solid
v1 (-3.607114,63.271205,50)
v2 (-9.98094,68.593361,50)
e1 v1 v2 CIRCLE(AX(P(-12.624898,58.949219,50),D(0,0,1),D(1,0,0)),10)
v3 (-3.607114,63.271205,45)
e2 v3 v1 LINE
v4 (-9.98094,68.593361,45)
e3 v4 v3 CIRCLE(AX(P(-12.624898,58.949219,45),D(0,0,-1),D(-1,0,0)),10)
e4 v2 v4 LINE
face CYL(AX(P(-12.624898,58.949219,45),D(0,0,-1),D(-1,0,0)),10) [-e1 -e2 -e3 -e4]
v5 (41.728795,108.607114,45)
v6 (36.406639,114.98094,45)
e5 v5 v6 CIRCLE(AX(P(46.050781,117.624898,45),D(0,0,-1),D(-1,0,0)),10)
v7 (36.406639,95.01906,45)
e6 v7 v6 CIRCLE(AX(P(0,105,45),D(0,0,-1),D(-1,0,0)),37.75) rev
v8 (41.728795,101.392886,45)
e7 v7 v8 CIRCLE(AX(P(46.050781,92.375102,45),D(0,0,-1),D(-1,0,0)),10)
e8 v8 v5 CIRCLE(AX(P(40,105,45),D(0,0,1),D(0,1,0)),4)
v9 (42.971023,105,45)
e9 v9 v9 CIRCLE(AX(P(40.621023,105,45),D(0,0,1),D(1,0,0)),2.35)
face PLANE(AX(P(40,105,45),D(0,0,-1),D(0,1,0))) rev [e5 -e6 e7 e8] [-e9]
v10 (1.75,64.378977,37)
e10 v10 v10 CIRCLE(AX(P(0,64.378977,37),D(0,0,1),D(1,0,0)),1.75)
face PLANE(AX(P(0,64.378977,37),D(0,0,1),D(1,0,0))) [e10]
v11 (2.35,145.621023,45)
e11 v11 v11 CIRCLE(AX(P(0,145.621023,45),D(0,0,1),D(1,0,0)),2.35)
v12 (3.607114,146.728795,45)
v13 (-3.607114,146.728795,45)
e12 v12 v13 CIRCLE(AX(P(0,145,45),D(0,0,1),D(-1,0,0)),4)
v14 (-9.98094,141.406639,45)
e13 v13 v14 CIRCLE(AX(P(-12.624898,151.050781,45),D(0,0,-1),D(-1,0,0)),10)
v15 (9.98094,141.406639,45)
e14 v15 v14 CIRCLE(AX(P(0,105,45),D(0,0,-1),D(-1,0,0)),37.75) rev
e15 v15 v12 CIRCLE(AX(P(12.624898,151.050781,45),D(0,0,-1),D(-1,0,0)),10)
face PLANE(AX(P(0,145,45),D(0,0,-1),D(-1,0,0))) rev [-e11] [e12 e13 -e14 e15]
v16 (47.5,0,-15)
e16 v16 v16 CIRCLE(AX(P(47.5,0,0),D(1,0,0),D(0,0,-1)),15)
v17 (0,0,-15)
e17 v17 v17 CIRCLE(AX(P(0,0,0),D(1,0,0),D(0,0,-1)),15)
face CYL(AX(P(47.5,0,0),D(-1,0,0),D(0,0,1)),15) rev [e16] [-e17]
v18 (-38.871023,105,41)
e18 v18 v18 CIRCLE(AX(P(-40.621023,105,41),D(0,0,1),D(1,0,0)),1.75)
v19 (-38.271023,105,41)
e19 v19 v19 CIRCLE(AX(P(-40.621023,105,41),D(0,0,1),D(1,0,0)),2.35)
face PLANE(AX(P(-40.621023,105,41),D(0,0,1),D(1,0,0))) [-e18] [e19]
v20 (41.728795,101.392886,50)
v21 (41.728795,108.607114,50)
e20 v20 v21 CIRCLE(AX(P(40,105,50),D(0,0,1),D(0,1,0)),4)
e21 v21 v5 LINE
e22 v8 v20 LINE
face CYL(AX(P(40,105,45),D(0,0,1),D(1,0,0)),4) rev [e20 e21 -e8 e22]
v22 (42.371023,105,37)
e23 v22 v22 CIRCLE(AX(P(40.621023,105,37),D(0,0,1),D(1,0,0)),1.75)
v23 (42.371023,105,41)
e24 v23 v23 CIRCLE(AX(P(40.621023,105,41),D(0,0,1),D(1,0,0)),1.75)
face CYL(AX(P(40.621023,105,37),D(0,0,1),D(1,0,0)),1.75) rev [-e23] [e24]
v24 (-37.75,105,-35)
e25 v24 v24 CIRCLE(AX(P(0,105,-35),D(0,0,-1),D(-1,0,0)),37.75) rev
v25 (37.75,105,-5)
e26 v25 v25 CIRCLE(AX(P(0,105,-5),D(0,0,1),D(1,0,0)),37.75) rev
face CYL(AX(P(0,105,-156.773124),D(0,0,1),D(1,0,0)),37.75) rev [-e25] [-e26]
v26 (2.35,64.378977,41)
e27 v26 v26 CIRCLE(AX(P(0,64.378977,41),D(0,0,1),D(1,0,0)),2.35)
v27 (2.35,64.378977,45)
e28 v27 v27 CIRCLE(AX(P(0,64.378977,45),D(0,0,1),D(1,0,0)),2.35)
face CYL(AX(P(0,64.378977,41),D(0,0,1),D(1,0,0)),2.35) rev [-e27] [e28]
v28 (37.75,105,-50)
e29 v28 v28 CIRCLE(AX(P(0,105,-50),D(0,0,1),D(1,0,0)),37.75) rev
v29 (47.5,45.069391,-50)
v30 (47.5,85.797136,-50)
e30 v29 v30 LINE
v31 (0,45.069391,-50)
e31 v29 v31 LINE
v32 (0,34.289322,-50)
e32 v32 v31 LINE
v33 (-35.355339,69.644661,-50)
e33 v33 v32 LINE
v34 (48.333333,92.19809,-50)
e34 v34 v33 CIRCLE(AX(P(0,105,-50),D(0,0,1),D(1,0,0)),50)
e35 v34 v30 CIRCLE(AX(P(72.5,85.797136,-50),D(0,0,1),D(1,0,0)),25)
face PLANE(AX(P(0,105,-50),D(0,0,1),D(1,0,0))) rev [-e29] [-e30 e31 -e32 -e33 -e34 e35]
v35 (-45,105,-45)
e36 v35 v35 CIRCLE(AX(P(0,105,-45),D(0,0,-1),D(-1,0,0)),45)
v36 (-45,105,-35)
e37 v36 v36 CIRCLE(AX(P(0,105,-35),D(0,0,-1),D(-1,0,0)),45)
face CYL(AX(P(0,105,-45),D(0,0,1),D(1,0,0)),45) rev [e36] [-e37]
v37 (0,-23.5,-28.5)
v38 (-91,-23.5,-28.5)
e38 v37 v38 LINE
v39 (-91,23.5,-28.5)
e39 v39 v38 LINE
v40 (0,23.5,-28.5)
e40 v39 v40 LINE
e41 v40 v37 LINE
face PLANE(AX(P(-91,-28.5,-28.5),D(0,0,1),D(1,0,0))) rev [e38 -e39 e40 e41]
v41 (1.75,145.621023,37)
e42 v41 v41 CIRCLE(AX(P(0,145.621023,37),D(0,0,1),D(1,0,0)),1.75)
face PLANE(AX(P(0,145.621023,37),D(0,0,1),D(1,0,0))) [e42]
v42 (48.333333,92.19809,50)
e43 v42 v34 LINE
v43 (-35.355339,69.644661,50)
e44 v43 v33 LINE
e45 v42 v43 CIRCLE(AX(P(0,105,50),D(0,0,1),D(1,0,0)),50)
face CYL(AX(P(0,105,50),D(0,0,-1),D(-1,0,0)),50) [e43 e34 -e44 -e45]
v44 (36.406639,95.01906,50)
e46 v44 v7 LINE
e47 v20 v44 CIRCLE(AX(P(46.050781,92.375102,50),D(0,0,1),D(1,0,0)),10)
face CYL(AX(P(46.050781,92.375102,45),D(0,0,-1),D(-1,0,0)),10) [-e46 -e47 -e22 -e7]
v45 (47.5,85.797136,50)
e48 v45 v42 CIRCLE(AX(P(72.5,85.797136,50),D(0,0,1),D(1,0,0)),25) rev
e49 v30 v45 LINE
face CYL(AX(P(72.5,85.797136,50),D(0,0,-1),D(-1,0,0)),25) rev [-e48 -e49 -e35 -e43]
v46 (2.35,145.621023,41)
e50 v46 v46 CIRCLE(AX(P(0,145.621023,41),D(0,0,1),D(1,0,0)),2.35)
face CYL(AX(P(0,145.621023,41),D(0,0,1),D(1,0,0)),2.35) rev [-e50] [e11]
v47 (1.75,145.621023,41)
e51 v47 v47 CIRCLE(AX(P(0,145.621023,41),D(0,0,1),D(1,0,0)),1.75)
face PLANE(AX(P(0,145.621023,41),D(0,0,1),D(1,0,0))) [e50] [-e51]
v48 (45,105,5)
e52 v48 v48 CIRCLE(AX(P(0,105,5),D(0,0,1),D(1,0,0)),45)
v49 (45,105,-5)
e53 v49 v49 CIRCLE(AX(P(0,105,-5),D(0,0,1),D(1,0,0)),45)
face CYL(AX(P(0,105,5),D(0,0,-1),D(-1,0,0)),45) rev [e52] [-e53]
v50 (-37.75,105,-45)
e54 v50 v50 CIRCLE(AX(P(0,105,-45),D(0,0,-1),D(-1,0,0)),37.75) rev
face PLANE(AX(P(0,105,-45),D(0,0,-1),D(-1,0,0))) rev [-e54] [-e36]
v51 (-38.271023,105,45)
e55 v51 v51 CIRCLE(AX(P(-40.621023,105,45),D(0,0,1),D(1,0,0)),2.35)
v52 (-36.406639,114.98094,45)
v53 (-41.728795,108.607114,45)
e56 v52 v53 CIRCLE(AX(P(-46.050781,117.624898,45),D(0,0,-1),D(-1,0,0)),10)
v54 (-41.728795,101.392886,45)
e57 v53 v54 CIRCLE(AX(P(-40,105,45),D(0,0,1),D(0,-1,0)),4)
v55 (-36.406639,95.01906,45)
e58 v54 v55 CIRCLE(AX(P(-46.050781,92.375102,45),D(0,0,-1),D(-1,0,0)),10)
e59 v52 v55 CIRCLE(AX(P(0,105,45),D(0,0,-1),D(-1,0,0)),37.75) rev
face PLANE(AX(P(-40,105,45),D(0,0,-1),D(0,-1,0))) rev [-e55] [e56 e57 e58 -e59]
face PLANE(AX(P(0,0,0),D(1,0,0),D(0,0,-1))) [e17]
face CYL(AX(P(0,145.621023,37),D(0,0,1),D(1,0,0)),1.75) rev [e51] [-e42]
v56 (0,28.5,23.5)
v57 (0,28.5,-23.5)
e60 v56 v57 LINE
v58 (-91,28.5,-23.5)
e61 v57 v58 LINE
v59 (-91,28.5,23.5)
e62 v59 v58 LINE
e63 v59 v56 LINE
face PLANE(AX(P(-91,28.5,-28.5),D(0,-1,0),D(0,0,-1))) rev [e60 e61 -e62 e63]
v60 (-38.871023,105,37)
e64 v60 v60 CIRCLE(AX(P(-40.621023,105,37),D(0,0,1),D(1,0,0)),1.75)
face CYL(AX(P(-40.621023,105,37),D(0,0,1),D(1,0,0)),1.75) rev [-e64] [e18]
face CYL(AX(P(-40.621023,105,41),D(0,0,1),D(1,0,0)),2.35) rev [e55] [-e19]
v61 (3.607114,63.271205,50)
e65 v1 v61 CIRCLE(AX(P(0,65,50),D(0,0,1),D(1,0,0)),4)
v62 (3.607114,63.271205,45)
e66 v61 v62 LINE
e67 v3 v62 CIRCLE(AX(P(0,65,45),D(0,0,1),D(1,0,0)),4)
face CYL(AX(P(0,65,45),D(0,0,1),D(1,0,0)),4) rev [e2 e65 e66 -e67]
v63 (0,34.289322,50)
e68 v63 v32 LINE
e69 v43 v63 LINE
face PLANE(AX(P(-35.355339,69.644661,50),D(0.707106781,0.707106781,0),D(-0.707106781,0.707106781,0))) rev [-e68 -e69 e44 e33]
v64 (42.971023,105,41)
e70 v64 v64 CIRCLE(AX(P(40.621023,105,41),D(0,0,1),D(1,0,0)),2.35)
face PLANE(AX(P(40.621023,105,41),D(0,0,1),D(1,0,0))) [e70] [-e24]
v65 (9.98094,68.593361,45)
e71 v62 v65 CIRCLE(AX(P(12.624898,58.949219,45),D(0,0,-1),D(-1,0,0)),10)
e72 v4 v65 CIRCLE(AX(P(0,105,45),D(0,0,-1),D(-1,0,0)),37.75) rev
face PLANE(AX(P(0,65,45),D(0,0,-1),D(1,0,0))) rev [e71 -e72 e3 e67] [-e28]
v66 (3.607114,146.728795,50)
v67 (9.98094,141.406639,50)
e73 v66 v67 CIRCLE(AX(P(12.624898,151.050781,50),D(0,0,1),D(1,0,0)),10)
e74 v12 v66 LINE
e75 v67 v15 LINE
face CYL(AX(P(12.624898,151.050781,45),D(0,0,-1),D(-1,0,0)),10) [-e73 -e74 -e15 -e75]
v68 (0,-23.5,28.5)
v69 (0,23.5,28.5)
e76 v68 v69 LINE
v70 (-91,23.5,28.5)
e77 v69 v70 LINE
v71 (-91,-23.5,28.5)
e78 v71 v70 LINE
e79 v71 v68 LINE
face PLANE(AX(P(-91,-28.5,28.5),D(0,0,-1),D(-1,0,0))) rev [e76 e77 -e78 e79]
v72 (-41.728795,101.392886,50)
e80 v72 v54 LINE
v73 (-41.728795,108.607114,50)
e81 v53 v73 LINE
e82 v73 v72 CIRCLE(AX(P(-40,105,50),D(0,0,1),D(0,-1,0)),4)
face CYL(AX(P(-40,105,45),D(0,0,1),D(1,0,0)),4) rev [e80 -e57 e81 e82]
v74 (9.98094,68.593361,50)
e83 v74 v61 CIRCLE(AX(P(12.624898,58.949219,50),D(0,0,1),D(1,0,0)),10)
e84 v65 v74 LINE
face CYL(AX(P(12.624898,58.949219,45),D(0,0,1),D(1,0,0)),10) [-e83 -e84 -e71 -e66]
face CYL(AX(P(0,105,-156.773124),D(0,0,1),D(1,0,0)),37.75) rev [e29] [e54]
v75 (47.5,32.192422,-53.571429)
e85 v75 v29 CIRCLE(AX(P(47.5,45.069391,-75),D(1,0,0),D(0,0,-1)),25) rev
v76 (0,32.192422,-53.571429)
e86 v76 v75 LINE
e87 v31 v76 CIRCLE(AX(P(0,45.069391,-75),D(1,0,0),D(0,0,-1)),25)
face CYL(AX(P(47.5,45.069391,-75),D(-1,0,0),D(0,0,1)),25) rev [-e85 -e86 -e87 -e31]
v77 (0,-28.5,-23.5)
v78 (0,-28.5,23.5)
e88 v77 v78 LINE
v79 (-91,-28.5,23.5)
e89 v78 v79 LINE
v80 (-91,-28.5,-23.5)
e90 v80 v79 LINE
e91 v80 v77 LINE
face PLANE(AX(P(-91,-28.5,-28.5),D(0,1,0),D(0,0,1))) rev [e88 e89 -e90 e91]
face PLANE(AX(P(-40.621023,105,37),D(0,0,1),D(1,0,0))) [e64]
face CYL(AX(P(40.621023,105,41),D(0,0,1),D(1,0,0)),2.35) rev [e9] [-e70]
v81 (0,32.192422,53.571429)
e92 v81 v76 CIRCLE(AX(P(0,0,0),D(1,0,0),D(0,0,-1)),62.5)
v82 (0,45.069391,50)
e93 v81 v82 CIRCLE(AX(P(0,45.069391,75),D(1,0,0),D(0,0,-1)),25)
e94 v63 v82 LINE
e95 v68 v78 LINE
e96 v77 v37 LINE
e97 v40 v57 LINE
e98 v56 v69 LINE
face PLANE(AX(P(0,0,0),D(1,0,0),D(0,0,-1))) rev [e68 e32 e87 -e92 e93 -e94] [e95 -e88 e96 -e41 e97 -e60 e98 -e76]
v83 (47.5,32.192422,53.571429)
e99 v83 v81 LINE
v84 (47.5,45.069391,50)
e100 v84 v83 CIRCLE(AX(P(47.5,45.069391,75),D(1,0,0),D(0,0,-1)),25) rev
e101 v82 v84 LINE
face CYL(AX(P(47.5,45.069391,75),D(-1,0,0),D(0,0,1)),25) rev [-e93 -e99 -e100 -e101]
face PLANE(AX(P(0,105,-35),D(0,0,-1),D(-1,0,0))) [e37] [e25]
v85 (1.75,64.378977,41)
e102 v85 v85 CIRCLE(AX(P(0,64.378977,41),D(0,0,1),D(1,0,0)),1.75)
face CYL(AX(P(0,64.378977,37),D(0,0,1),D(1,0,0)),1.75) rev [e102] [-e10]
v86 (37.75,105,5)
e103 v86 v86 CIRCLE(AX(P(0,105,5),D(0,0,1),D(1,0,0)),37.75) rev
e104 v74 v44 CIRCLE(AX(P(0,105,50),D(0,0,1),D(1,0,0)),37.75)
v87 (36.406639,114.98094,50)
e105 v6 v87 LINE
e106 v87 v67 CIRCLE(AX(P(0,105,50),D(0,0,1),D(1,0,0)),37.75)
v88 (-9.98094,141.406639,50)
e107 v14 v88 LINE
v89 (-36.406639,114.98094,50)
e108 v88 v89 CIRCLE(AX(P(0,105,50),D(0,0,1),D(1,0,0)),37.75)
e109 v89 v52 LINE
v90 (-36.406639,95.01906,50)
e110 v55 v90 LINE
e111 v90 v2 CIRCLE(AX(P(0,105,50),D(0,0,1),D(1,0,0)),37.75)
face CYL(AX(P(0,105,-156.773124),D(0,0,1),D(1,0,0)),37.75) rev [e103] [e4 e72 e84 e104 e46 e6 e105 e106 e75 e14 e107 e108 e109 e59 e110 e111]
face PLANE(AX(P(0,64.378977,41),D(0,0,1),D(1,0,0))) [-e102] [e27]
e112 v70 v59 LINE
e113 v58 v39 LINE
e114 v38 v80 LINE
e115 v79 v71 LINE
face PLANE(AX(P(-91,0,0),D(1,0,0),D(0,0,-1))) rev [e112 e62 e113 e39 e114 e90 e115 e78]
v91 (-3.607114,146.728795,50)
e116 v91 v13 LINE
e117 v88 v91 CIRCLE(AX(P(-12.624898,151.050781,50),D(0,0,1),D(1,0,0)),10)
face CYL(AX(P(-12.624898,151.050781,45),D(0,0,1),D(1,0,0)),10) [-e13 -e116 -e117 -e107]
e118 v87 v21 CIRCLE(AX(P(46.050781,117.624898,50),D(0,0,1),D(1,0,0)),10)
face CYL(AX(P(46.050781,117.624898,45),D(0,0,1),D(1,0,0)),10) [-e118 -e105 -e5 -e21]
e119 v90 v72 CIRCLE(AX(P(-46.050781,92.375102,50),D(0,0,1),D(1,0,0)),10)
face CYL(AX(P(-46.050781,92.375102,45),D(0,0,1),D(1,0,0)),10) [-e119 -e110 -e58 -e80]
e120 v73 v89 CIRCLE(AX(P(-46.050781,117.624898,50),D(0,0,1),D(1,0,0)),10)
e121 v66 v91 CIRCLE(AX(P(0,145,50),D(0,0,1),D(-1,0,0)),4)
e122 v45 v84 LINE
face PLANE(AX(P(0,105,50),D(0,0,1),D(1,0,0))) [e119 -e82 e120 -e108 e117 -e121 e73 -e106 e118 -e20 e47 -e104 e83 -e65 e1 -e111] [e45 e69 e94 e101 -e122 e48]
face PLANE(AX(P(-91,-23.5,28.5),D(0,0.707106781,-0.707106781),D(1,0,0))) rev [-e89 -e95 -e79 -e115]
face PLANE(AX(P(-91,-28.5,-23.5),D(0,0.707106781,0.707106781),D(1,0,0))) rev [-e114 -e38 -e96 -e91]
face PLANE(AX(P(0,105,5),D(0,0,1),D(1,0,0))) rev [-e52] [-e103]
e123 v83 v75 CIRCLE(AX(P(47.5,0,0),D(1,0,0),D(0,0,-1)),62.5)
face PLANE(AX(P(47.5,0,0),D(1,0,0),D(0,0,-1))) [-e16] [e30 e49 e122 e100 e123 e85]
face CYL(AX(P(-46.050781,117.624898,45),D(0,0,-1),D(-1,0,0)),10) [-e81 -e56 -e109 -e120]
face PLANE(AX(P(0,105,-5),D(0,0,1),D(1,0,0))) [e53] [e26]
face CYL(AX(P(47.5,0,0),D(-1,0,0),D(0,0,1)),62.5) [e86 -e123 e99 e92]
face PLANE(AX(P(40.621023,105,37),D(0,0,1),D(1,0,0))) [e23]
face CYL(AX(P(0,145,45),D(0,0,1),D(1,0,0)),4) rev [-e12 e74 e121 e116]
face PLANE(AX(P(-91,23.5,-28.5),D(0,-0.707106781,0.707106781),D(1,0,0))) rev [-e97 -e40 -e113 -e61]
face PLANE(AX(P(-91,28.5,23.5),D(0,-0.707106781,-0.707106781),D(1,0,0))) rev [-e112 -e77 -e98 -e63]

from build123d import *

# Parameters (mm, degrees)
SKETCH1_R                = 62.5
SKETCH1_R_2              = 15
BOSS_EXTRUDE1_DEPTH      = 47.5
SKETCH2_R                = 32.5
BOSS_EXTRUDE2_DEPTH      = 50
BOSS_EXTRUDE3_START      = -47.5
BOSS_EXTRUDE3_DEPTH      = 47.5
BOSS_EXTRUDE4_DEPTH      = 100
FILLET1_R                = 25
SKETCH5_W                = 57
SKETCH5_H                = 57
BOSS_EXTRUDE5_DEPTH      = 91
CHAMFER1_SIZE            = 5
SKETCH6_R                = 37.75
CUT_EXTRUDE1_DEPTH       = 100
CUT_EXTRUDE2_DEPTH       = 5
CUT_EXTRUDE2_DEPTH_BACK  = 5
SKETCH8_R                = 45
CUT_EXTRUDE3_DEPTH       = 5
CUT_EXTRUDE3_DEPTH_BACK  = 5
SKETCH9_R                = 45
CUT_EXTRUDE4_DEPTH       = 5
FILLET2_R                = 10
CIRPATTERN1_COUNT        = 4
FILLET2_OF_CIRPATTERN1_R = 10
SKETCH11_R               = 2.35
CUT_EXTRUDE5_DEPTH       = 4
SKETCH12_R               = 1.75
CUT_EXTRUDE6_DEPTH       = 4


with BuildPart() as part:
    # Sketch1 → Boss-Extrude1 (new body)
    with BuildSketch(Plane(origin=(0, 0, 0), x_dir=(0, 0, -1), z_dir=(1, 0, 0))):
        Circle(SKETCH1_R)
        Circle(SKETCH1_R_2, mode=Mode.SUBTRACT)
    extrude(amount=BOSS_EXTRUDE1_DEPTH)

    # Sketch2 → Boss-Extrude2 (add, symmetric)
    with BuildSketch(Plane.XY):
        with BuildLine():
            Line((-35.355339059, 69.644660941), (0, 34.289321881))
            Line((0, 34.289321881), (0, 55))
            ThreePointArc((0, 55), (19.134171618, 151.193976626), (-35.355339059, 69.644660941))
        make_face()
        with Locations((0, 105)):
            Circle(SKETCH2_R, mode=Mode.SUBTRACT)
    extrude(amount=BOSS_EXTRUDE2_DEPTH, both=True)

    # Sketch3 → Boss-Extrude3 (add)
    with BuildSketch(Plane(origin=(47.5, 0, 0), x_dir=(0, 0, -1), z_dir=(1, 0, 0)).offset(BOSS_EXTRUDE3_START)):
        with BuildLine():
            Line((-50, 55), (-50, 62.5))
            Line((-50, 62.5), (50, 62.5))
            Line((50, 62.5), (50, 55))
            Line((50, 55), (50, 37.5))
            ThreePointArc((50, 37.5), (40.792418173, 47.352176503), (29.685855218, 55))
            Line((29.685855218, 55), (-29.685855218, 55))
            ThreePointArc((-29.685855218, 55), (-40.792418173, 47.352176503), (-50, 37.5))
            Line((-50, 37.5), (-50, 55))
        make_face()
    extrude(amount=BOSS_EXTRUDE3_DEPTH)

    # Sketch4 → Boss-Extrude4 (add)
    with BuildSketch(Plane.XY.offset(50)):
        with BuildLine():
            Line((26.339134382, 62.5), (47.5, 62.5))
            Line((47.5, 62.5), (47.5, 89.387505004))
            ThreePointArc((47.5, 89.387505004), (39.291079432, 74.07733716), (26.339134382, 62.5))
        make_face()
    extrude(amount=-BOSS_EXTRUDE4_DEPTH)

    # Fillet1
    fillet1_edges = [part.edges().sort_by_distance(p)[0] for p in [
        (23.75, 37.5, 50),
        (23.75, 37.5, -50),
        (47.5, 89.387505004, 0),
    ]]
    fillet(fillet1_edges, radius=FILLET1_R)

    # Sketch5 → Boss-Extrude5 (add)
    with BuildSketch(Plane.ZY):
        Rectangle(SKETCH5_W, SKETCH5_H)
    extrude(amount=BOSS_EXTRUDE5_DEPTH)

    # Chamfer1
    chamfer1_edges = [part.edges().sort_by_distance(p)[0] for p in [
        (-45.5, -28.5, 28.5),
        (-45.5, 28.5, 28.5),
        (-45.5, 28.5, -28.5),
        (-45.5, -28.5, -28.5),
    ]]
    chamfer(chamfer1_edges, length=CHAMFER1_SIZE)

    # Sketch6 → Cut-Extrude1 (cut)
    with BuildSketch(Plane.XY.offset(50)):
        with Locations((0, 105)):
            Circle(SKETCH6_R)
    extrude(amount=-CUT_EXTRUDE1_DEPTH, mode=Mode.SUBTRACT)

    # Sketch8 → Cut-Extrude2 (cut, two sides: drawn at the far end of the back side and taken through both)
    with BuildSketch(Plane.XY.offset(-CUT_EXTRUDE2_DEPTH_BACK)):
        with Locations((0, 105)):
            Circle(SKETCH8_R)
    extrude(amount=CUT_EXTRUDE2_DEPTH + CUT_EXTRUDE2_DEPTH_BACK, mode=Mode.SUBTRACT)

    # Sketch9 → Cut-Extrude3 (cut, two sides: drawn at the far end of the back side and taken through both)
    with BuildSketch(Plane(origin=(0, 0, -40), x_dir=(-1, 0, 0), z_dir=(0, 0, -1)).offset(-CUT_EXTRUDE3_DEPTH_BACK)):
        with Locations(Location((0, 105, 0), (0, 0, 180))):
            Circle(SKETCH9_R)
    extrude(amount=CUT_EXTRUDE3_DEPTH + CUT_EXTRUDE3_DEPTH_BACK, mode=Mode.SUBTRACT)

    # Sketch10 → Cut-Extrude4 (cut)
    with BuildSketch(Plane.XY.offset(50)):
        with BuildLine():
            Line((-4, 142.399360944), (-4, 145))
            ThreePointArc((-4, 145), (0, 149), (4, 145))
            Line((4, 145), (4, 142.487163458))
            ThreePointArc((4, 142.487163458), (-0.003307195, 142.744592568), (-4, 142.399360944))
        make_face()
    cut_extrude4 = extrude(amount=-CUT_EXTRUDE4_DEPTH, mode=Mode.SUBTRACT)

    # Fillet2
    # the kernel refuses this fillet: 10 mm, written as the material it takes off along each edge
    with BuildSketch(Plane(origin=(-4, 142.537481269, 45), x_dir=(-0.9825908408243521, -0.18578277511139907, 0), z_dir=(0, 0, 1))) as fillet2_piece_1:
        with BuildLine():
            CenterArc((6.893121156, -9.967448048), FILLET2_R, 94.624278966, 49.061773925)
            Line((-1.164720332, -4.045354621), (-1.970504481, -3.453145278))
            ThreePointArc((-1.970504481, -3.453145278), (-1.440084404, -2.233865576), (-0.982590841, 0.185782775))
            Line((-0.982590841, 0.185782775), (0.0806213, 0.996744805))
            ThreePointArc((0.0806213, 0.996744805), (3.043454077, 0.877116383), (6.006286855, 0.996744805))
            Line((6.006286855, 0.996744805), (6.086908155, 0))
        make_face()
    extrude(amount=20.217270387, mode=Mode.SUBTRACT)
    with BuildSketch(Plane(origin=(4, 142.537481269, 45), x_dir=(0.9825908408243521, -0.18578277511139857, 0), z_dir=(0, 0, 1))) as fillet2_piece_2:
        with BuildLine():
            CenterArc((6.893121156, 9.967448048), FILLET2_R, 216.31394711, 49.061773925)
            Line((-1.164720332, 4.045354621), (-1.970504481, 3.453145278))
            ThreePointArc((-1.970504481, 3.453145278), (-1.440084404, 2.233865576), (-0.982590841, -0.185782775))
            Line((-0.982590841, -0.185782775), (0.0806213, -0.996744805))
            ThreePointArc((0.0806213, -0.996744805), (3.043454077, -0.877116383), (6.006286855, -0.996744805))
            Line((6.006286855, -0.996744805), (6.086908155, 0))
        make_face()
    extrude(amount=20.217270387, mode=Mode.SUBTRACT)

    # CirPattern1: Cut-Extrude4 ×4 about axis
    cirpattern1_axis = Axis((0, 105, 0), (0, 0, 1))
    for i in range(1, CIRPATTERN1_COUNT):
        add(cut_extrude4.rotate(cirpattern1_axis, i * 360 / CIRPATTERN1_COUNT), mode=Mode.SUBTRACT)

    # Fillet2 of CirPattern1
    # the kernel refuses this fillet: 10 mm, written as the material it takes off along each edge
    with BuildSketch(Plane(origin=(-37.537481269, 101, 45), x_dir=(0.1857827751113988, -0.9825908408243521, 0), z_dir=(0, 0, 1)), Plane(origin=(4, 67.462518731, 45), x_dir=(0.9825908408243522, 0.18578277511139812, 0), z_dir=(0, 0, 1)), Plane(origin=(37.537481269, 109, 45), x_dir=(-0.1857827751113974, 0.9825908408243524, 0), z_dir=(0, 0, 1))) as fillet2_of_cirpattern1_piece_1:
        with BuildLine():
            CenterArc((6.893121156, -9.967448048), FILLET2_OF_CIRPATTERN1_R, 94.624278966, 49.061773925)
            Line((-1.164720332, -4.045354621), (-1.970504481, -3.453145278))
            ThreePointArc((-1.970504481, -3.453145278), (-1.440084404, -2.233865576), (-0.982590841, 0.185782775))
            Line((-0.982590841, 0.185782775), (0.0806213, 0.996744805))
            ThreePointArc((0.0806213, 0.996744805), (3.043454077, 0.877116383), (6.006286855, 0.996744805))
            Line((6.006286855, 0.996744805), (6.086908155, 0))
        make_face()
    extrude(amount=20.217270387, mode=Mode.SUBTRACT)
    with BuildSketch(Plane(origin=(-37.537481269, 109, 45), x_dir=(0.18578277511140218, 0.9825908408243516, 0), z_dir=(0, 0, 1)), Plane(origin=(-4, 67.462518731, 45), x_dir=(-0.982590840824351, 0.1857827751114053, 0), z_dir=(0, 0, 1)), Plane(origin=(37.537481269, 101, 45), x_dir=(-0.18578277511140162, -0.9825908408243517, 0), z_dir=(0, 0, 1))) as fillet2_of_cirpattern1_piece_2:
        with BuildLine():
            CenterArc((6.893121156, 9.967448048), FILLET2_OF_CIRPATTERN1_R, 216.31394711, 49.061773925)
            Line((-1.164720332, 4.045354621), (-1.970504481, 3.453145278))
            ThreePointArc((-1.970504481, 3.453145278), (-1.440084404, 2.233865576), (-0.982590841, -0.185782775))
            Line((-0.982590841, -0.185782775), (0.0806213, -0.996744805))
            ThreePointArc((0.0806213, -0.996744805), (3.043454077, -0.877116383), (6.006286855, -0.996744805))
            Line((6.006286855, -0.996744805), (6.086908155, 0))
        make_face()
    extrude(amount=20.217270387, mode=Mode.SUBTRACT)

    # Sketch11 → Cut-Extrude5 (cut)
    with BuildSketch(Plane.XY.offset(45)):
        with Locations((0, 145.621023241)):
            Circle(SKETCH11_R)
        with Locations((40.621023241, 105)):
            Circle(SKETCH11_R)
        with Locations((0, 64.378976759)):
            Circle(SKETCH11_R)
        with Locations((-40.621023241, 105)):
            Circle(SKETCH11_R)
    extrude(amount=-CUT_EXTRUDE5_DEPTH, mode=Mode.SUBTRACT)

    # Sketch12 → Cut-Extrude6 (cut)
    with BuildSketch(Plane.XY.offset(41)):
        with Locations((0, 145.621023241)):
            Circle(SKETCH12_R)
        with Locations((40.621023241, 105)):
            Circle(SKETCH12_R)
        with Locations((0, 64.378976759)):
            Circle(SKETCH12_R)
        with Locations((-40.621023241, 105)):
            Circle(SKETCH12_R)
    extrude(amount=-CUT_EXTRUDE6_DEPTH, mode=Mode.SUBTRACT)


solid = part.part
